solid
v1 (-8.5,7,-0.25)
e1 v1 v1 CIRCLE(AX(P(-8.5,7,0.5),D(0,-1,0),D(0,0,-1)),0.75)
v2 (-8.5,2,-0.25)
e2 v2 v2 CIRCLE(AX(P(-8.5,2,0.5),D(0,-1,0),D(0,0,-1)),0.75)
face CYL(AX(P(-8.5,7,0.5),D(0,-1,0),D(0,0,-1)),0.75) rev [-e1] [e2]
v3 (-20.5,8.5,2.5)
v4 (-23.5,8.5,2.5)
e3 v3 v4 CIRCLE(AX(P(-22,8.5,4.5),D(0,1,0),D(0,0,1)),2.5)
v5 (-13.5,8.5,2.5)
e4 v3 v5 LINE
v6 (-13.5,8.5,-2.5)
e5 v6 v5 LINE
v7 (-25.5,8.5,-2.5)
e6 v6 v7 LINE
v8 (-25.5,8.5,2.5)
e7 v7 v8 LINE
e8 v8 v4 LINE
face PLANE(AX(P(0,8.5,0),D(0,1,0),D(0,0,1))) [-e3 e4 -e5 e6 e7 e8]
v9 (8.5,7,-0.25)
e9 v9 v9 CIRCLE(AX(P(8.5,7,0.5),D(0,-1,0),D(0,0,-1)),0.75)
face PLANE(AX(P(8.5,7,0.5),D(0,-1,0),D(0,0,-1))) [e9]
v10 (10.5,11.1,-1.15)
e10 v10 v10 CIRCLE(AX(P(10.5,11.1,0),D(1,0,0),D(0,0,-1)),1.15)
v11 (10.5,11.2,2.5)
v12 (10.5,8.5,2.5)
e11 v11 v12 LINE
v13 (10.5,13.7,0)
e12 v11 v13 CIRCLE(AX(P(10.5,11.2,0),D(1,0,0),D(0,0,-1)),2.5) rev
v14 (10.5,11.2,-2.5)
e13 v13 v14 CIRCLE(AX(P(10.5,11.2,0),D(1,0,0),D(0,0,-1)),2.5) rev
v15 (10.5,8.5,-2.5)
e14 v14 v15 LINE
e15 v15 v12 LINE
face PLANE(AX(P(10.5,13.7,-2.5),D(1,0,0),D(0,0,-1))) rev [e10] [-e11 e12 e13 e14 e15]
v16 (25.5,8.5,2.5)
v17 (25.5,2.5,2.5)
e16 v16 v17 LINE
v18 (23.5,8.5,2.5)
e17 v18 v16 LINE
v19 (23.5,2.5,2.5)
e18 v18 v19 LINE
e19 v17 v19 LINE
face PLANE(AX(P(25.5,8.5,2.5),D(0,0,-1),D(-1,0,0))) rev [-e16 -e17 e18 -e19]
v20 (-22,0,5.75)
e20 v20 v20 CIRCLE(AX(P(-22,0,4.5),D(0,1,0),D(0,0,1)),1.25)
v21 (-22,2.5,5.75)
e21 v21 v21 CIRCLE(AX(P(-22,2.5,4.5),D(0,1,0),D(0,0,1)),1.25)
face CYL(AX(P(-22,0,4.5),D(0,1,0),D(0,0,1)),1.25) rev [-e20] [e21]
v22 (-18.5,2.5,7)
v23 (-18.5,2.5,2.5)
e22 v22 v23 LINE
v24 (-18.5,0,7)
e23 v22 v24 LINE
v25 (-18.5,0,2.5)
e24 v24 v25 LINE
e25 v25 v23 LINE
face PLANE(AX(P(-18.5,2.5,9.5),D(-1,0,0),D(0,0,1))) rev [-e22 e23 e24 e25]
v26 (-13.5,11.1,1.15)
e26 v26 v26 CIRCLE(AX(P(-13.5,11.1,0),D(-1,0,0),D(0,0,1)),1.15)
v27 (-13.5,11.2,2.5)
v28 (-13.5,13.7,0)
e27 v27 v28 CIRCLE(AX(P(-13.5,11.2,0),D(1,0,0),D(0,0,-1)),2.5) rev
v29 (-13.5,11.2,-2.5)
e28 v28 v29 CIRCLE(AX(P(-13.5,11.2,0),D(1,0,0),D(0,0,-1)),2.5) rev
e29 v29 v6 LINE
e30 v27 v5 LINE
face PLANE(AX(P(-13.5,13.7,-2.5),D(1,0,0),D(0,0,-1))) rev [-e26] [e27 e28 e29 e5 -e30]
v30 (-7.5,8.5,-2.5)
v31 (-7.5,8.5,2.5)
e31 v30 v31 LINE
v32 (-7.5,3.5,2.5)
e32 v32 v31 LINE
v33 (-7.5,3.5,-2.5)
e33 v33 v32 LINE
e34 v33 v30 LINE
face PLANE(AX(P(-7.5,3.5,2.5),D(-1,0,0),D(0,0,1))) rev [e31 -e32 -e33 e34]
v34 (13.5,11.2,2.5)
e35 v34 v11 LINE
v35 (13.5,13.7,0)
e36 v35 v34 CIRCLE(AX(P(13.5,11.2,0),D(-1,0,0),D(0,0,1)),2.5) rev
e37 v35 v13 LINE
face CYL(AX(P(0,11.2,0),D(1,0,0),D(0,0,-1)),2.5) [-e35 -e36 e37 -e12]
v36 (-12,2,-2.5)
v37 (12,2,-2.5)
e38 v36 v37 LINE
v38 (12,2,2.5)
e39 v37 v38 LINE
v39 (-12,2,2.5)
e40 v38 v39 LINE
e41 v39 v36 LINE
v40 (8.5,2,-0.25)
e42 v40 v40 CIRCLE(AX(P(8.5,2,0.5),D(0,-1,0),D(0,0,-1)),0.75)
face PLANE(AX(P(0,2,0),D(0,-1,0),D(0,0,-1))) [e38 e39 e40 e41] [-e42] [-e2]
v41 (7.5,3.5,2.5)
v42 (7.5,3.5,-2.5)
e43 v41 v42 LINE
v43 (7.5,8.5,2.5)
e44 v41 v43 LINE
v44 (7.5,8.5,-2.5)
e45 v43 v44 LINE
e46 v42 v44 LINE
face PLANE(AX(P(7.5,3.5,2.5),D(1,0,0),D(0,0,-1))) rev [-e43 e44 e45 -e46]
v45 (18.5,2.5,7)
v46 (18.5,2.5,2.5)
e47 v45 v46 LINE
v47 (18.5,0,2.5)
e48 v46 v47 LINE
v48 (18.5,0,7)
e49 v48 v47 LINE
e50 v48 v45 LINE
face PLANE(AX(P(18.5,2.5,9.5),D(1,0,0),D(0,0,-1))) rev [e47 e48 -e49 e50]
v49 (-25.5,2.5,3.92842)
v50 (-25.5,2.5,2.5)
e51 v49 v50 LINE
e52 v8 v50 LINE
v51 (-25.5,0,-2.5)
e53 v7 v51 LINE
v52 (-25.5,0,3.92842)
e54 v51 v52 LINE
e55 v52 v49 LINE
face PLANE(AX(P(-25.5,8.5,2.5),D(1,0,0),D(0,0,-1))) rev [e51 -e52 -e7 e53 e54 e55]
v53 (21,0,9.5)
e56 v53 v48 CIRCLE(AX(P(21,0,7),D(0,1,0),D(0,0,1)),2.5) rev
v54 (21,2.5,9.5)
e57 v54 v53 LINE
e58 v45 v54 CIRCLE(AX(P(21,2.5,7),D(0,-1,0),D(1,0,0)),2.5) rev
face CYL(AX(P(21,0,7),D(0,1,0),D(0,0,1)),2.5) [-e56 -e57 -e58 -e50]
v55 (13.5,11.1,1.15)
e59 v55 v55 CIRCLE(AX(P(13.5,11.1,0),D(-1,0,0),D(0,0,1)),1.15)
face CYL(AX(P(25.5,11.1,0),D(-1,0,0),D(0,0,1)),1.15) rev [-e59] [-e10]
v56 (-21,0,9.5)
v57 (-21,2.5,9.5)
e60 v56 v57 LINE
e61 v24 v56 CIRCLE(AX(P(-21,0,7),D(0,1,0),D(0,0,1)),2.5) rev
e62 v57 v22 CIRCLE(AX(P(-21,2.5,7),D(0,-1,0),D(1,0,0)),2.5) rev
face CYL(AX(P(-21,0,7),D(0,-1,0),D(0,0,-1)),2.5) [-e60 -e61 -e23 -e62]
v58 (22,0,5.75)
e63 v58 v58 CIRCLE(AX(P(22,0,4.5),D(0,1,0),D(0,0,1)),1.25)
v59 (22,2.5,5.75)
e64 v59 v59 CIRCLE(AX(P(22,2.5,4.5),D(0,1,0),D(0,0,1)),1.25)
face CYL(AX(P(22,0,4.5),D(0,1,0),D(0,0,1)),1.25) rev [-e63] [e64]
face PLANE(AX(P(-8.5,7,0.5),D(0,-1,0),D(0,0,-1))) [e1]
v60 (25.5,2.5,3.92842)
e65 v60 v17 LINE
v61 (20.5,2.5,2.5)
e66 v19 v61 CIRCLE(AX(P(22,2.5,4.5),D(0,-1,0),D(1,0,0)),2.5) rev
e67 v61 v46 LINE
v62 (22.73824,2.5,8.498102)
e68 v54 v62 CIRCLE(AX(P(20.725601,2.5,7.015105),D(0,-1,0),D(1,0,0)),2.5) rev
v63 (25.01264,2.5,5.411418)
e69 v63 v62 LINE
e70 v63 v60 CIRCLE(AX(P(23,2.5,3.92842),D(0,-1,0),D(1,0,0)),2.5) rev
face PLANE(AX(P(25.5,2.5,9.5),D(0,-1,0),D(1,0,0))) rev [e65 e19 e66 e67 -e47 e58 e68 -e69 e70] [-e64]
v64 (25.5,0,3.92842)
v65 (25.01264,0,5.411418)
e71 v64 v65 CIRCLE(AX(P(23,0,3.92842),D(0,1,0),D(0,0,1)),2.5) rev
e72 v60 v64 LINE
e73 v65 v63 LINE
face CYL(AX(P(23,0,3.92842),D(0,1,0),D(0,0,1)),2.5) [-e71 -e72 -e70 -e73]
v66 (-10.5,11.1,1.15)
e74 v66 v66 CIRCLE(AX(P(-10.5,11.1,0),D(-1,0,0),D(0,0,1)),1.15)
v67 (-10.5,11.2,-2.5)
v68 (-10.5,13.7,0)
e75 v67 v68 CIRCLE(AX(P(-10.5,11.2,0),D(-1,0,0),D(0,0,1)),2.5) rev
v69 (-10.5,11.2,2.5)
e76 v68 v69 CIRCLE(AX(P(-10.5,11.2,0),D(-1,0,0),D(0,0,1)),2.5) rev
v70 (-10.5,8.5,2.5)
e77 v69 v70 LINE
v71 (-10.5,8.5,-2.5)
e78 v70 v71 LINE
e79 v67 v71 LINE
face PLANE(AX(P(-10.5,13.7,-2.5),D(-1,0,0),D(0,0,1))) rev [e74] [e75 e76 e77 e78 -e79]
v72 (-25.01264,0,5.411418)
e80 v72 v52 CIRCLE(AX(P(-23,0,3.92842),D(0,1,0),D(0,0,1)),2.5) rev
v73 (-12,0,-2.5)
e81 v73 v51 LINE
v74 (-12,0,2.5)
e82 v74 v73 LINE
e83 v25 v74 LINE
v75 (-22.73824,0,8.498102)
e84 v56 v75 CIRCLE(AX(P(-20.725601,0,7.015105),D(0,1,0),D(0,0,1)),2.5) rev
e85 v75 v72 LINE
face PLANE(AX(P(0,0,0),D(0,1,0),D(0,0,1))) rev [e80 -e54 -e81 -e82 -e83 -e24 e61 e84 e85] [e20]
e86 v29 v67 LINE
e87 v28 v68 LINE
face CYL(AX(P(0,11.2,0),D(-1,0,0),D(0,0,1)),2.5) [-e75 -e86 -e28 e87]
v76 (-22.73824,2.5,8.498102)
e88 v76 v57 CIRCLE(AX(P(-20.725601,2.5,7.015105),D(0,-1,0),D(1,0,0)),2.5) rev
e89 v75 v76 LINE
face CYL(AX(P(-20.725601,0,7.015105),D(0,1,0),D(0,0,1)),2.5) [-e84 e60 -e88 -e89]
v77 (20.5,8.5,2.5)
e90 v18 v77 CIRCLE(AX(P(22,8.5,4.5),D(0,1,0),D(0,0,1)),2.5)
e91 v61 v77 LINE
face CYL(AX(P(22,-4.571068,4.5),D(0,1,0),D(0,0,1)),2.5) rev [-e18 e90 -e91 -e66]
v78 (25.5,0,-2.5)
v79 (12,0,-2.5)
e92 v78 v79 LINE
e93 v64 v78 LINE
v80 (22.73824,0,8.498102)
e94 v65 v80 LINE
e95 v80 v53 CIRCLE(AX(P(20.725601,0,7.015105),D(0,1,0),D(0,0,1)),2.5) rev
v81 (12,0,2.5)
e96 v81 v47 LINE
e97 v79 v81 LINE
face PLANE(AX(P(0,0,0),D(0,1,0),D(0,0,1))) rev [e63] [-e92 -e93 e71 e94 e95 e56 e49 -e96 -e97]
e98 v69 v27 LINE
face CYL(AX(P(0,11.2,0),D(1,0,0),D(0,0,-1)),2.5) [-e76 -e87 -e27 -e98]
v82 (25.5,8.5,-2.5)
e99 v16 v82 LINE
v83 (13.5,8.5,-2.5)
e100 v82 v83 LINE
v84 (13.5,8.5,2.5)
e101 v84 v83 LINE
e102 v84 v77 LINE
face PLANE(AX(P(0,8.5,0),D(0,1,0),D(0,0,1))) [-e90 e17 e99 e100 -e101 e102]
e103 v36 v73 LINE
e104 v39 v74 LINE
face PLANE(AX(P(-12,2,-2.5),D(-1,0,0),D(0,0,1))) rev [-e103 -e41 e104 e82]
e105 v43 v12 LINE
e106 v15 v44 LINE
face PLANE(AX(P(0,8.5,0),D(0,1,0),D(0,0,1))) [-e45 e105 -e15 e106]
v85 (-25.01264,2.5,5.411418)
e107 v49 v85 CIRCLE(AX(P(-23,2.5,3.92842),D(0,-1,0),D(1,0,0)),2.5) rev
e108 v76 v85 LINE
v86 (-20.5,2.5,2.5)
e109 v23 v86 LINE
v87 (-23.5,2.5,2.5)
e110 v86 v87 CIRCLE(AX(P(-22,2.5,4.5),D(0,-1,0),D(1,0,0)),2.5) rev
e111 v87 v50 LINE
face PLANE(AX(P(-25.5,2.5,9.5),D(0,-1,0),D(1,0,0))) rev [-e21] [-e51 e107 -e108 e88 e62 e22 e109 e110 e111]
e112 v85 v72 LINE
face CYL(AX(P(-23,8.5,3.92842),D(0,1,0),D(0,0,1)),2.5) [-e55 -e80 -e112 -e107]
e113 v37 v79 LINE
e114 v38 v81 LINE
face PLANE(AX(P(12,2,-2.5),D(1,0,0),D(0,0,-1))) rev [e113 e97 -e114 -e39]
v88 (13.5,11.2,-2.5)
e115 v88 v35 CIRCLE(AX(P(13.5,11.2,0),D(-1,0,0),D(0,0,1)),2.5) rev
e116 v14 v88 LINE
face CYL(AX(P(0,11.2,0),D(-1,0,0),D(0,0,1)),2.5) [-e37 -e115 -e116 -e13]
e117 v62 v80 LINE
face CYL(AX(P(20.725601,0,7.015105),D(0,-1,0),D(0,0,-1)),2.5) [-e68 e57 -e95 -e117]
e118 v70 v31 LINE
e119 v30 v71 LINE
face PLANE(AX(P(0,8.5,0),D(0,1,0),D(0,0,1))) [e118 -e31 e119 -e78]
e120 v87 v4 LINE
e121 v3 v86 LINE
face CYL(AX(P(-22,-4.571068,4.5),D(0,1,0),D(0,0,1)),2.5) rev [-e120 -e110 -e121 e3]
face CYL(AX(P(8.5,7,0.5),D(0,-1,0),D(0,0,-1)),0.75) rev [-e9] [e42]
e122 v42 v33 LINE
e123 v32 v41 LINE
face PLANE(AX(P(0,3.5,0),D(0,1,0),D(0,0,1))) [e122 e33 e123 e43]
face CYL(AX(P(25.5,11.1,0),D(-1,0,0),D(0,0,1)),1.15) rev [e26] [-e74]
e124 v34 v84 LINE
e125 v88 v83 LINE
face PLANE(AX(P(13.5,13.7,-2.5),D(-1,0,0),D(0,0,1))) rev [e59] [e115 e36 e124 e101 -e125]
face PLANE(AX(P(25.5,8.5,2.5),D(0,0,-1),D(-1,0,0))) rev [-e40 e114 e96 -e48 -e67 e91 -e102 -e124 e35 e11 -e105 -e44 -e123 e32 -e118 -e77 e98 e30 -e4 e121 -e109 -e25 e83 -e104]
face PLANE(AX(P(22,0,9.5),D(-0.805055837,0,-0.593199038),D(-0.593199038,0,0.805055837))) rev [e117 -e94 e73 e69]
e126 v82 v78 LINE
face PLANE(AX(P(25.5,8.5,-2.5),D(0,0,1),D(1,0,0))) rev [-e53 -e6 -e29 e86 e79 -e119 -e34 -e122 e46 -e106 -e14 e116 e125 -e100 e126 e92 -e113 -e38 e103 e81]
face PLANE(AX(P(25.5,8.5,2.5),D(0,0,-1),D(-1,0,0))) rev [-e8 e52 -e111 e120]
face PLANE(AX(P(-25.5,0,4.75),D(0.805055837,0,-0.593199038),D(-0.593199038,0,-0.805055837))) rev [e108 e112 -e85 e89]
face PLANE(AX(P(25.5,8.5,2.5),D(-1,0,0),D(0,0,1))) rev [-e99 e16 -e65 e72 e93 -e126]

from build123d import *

# Parameters (mm, degrees)
SKETCH1_W           = 51
SKETCH1_H           = 5
BOSS_EXTRUDE1_DEPTH = 8.5
SKETCH2_W           = 15
SKETCH2_H           = 5
CUT_EXTRUDE1_DEPTH  = 5
SKETCH3_W           = 24
SKETCH3_H           = 5
CUT_EXTRUDE2_DEPTH  = 2
SKETCH4_W           = 7
SKETCH4_H           = 2.5
BOSS_EXTRUDE2_DEPTH = 7
SKETCH5_W           = 3
SKETCH5_H           = 5
BOSS_EXTRUDE3_DEPTH = 5.2
SKETCH6_R           = 1.25
CUT_EXTRUDE3_DEPTH  = 30.42685848
SKETCH7_R           = 0.75
CUT_EXTRUDE4_DEPTH  = 5
SKETCH8_R           = 1.15
CUT_EXTRUDE5_DEPTH  = 43.413912812
SKETCH9_R           = 2.5
CUT_EXTRUDE6_DEPTH  = 6
FILLET1_R           = 2.5
CUT_EXTRUDE7_DEPTH  = 30.42685848
FILLET2_R           = 2.5


with BuildPart() as part:
    # Sketch1 → Boss-Extrude1 (new body)
    with BuildSketch(Plane(origin=(0, 0, 0), x_dir=(1, 0, 0), z_dir=(0, 1, 0))):
        Rectangle(SKETCH1_W, SKETCH1_H)
    extrude(amount=BOSS_EXTRUDE1_DEPTH)

    # Sketch2 → Cut-Extrude1 (cut)
    with BuildSketch(Plane(origin=(0, 8.5, 0), x_dir=(1, 0, 0), z_dir=(0, 1, 0))):
        Rectangle(SKETCH2_W, SKETCH2_H)
    extrude(amount=-CUT_EXTRUDE1_DEPTH, mode=Mode.SUBTRACT)

    # Sketch3 → Cut-Extrude2 (cut)
    with BuildSketch(Plane.XZ):
        Rectangle(SKETCH3_W, SKETCH3_H)
    extrude(amount=-CUT_EXTRUDE2_DEPTH, mode=Mode.SUBTRACT)

    # Sketch4 → Boss-Extrude2 (add)
    with BuildSketch(Plane.XY.offset(2.5)):
        with Locations((-22, 1.25)):
            Rectangle(SKETCH4_W, SKETCH4_H)
        with Locations((22, 1.25)):
            Rectangle(SKETCH4_W, SKETCH4_H)
    extrude(amount=BOSS_EXTRUDE2_DEPTH)

    # Sketch5 → Boss-Extrude3 (add)
    with BuildSketch(Plane(origin=(0, 8.5, 0), x_dir=(1, 0, 0), z_dir=(0, 1, 0))):
        with Locations((-12, 0)):
            Rectangle(SKETCH5_W, SKETCH5_H)
        with Locations((12, 0)):
            Rectangle(SKETCH5_W, SKETCH5_H)
    extrude(amount=BOSS_EXTRUDE3_DEPTH)

    # Sketch6 → Cut-Extrude3 (cut, through all)
    with BuildSketch(Plane(origin=(0, 2.5, 0), x_dir=(1, 0, 0), z_dir=(0, 1, 0))):
        with Locations(Location((-22, -4.5, 0), (0, 0, 270))):
            Circle(SKETCH6_R)
        with Locations(Location((22, -4.5, 0), (0, 0, 270))):
            Circle(SKETCH6_R)
    extrude(amount=-CUT_EXTRUDE3_DEPTH, mode=Mode.SUBTRACT)

    # Sketch7 → Cut-Extrude4 (cut)
    with BuildSketch(Plane.XZ.offset(-2)):
        with Locations(Location((-8.5, 0.5, 0), (0, 0, 270))):
            Circle(SKETCH7_R)
        with Locations(Location((8.5, 0.5, 0), (0, 0, 270))):
            Circle(SKETCH7_R)
    extrude(amount=-CUT_EXTRUDE4_DEPTH, mode=Mode.SUBTRACT)

    # Sketch8 → Cut-Extrude5 (cut, through all)
    with BuildSketch(Plane.ZY.offset(13.5)):
        with Locations((0, 11.1)):
            Circle(SKETCH8_R)
    extrude(amount=-CUT_EXTRUDE5_DEPTH, mode=Mode.SUBTRACT)

    # Sketch9 → Cut-Extrude6 (cut)
    with BuildSketch(Plane(origin=(0, 8.5, 0), x_dir=(1, 0, 0), z_dir=(0, 1, 0))):
        with Locations((-22, -4.5)):
            Circle(SKETCH9_R)
        with Locations((22, -4.5)):
            Circle(SKETCH9_R)
    extrude(amount=-CUT_EXTRUDE6_DEPTH, mode=Mode.SUBTRACT)

    # Fillet1
    # the kernel refuses this fillet: 2.5 mm, written as the material it takes off along each edge
    with BuildSketch(Plane(origin=(-25.5, -6.25, 9.5), x_dir=(0, 0, -1), z_dir=(0, 1, 0)), Plane(origin=(-18.5, 8.75, 9.5), x_dir=(0, 0, -1), z_dir=(0, -1, 0))) as fillet1_piece_1:
        with BuildLine():
            CenterArc((FILLET1_R, -FILLET1_R), FILLET1_R, 90, 90)
            Line((0, -FILLET1_R), (0, 0))
            Line((0, 0), (FILLET1_R, 0))
        make_face()
    extrude(amount=15, mode=Mode.SUBTRACT)
    with BuildSketch(Plane(origin=(18.5, 8.75, 9.5), x_dir=(0, 0, -1), z_dir=(0, -1, 0)), Plane(origin=(25.5, -6.25, 9.5), x_dir=(0, 0, -1), z_dir=(0, 1, 0))) as fillet1_piece_2:
        with BuildLine():
            CenterArc((FILLET1_R, FILLET1_R), FILLET1_R, 180, 90)
            Line((0, FILLET1_R), (0, 0))
            Line((0, 0), (FILLET1_R, 0))
        make_face()
    extrude(amount=15, mode=Mode.SUBTRACT)
    with BuildSketch(Plane(origin=(-4.25, 13.7, -2.5), x_dir=(0, 0, 1), z_dir=(-1, 0, 0)), Plane(origin=(19.75, 13.7, 2.5), x_dir=(0, -1, 0), z_dir=(-1, 0, 0))) as fillet1_piece_3:
        with BuildLine():
            CenterArc((FILLET1_R, -FILLET1_R), FILLET1_R, 90, 90)
            Line((0, -FILLET1_R), (0, 0))
            Line((0, 0), (FILLET1_R, 0))
        make_face()
    extrude(amount=15.5, mode=Mode.SUBTRACT)
    with BuildSketch(Plane(origin=(-19.75, 13.7, 2.5), x_dir=(0, -1, 0), z_dir=(1, 0, 0)), Plane(origin=(4.25, 13.7, -2.5), x_dir=(0, 0, 1), z_dir=(1, 0, 0))) as fillet1_piece_4:
        with BuildLine():
            CenterArc((FILLET1_R, FILLET1_R), FILLET1_R, 180, 90)
            Line((0, FILLET1_R), (0, 0))
            Line((0, 0), (FILLET1_R, 0))
        make_face()
    extrude(amount=15.5, mode=Mode.SUBTRACT)

    # Sketch10 → Cut-Extrude7 (cut, through all)
    with BuildSketch(Plane(origin=(0, 2.5, 0), x_dir=(1, 0, 0), z_dir=(0, 1, 0))):
        Polygon((-25.5, -4.75), (-22, -9.5), (-25.5, -9.5), align=None)
        Polygon((25.5, -4.75), (25.5, -9.5), (22, -9.5), align=None)
    extrude(amount=-CUT_EXTRUDE7_DEPTH, mode=Mode.SUBTRACT)

    # Fillet2
    # the kernel refuses this fillet: 2.5 mm, written as the material it takes off along each edge
    with BuildSketch(Plane(origin=(25.5, 4.553949751, 4.75), x_dir=(-0.5931990380498499, 0, 0.8050558373533682), z_dir=(0, -1, 0)), Plane(origin=(-25.5, 4.553949751, 4.75), x_dir=(0, 0, -1), z_dir=(0, -1, 0))) as fillet2_piece_1:
        with BuildLine():
            CenterArc((FILLET2_R * 0.328631960172, FILLET2_R), FILLET2_R, 233.615648184, 36.384351816)
            Line((-FILLET2_R * 0.264567077878, FILLET2_R * 0.194944162647), (-FILLET2_R * 0.276431058639, FILLET2_R * 0.1788430459))
            Line((-FILLET2_R * 0.276431058639, FILLET2_R * 0.1788430459), (-FILLET2_R * 0.00657263920345, -FILLET2_R * 0.02))
            Line((-FILLET2_R * 0.00657263920345, -FILLET2_R * 0.02), (FILLET2_R * 0.328631960172, -FILLET2_R * 0.02))
            Line((FILLET2_R * 0.328631960172, -FILLET2_R * 0.02), (FILLET2_R * 0.328631960172, 0))
        make_face()
    extrude(amount=6.607899502, mode=Mode.SUBTRACT)
    with BuildSketch(Plane(origin=(22, 5.611268046, 9.5), x_dir=(-1, 0, 0), z_dir=(0, -1, 0))) as fillet2_piece_2:
        with BuildLine():
            CenterArc((1.274399108, 2.484895396), FILLET2_R, 216.384351816, 47.314187929)
            Line((-0.738240485, 1.001897801), (-0.778493277, 0.972237849))
            Line((-0.778493277, 0.972237849), (-0.040252792, -0.029659952))
            Line((-0.040252792, -0.029659952), (0, -0.05))
            ThreePointArc((0, -0.05), (0.5, -0.05), (0.994512018, -0.049697908))
            Line((0.994512018, -0.049697908), (1, 0))
        make_face()
    extrude(amount=8.722536093, mode=Mode.SUBTRACT)
    with BuildSketch(Plane(origin=(-22, 5.611268046, 9.5), x_dir=(-0.5931990380498491, 0, -0.8050558373533688), z_dir=(0, -1, 0))) as fillet2_piece_3:
        with BuildLine():
            CenterArc((1.244507219, 2.5), FILLET2_R, 222.685812071, 47.314187929)
            Line((-0.593199038, 0.805055837), (-0.629953163, 0.771156954))
            ThreePointArc((-0.629953163, 0.771156954), (-0.336852311, 0.372867967), (-0.040252792, -0.029659952))
            Line((-0.040252792, -0.029659952), (0, -0.05))
            Line((0, -0.05), (1.244507219, -0.05))
            Line((1.244507219, -0.05), (1.244507219, 0))
        make_face()
    extrude(amount=8.722536093, mode=Mode.SUBTRACT)


solid = part.part
